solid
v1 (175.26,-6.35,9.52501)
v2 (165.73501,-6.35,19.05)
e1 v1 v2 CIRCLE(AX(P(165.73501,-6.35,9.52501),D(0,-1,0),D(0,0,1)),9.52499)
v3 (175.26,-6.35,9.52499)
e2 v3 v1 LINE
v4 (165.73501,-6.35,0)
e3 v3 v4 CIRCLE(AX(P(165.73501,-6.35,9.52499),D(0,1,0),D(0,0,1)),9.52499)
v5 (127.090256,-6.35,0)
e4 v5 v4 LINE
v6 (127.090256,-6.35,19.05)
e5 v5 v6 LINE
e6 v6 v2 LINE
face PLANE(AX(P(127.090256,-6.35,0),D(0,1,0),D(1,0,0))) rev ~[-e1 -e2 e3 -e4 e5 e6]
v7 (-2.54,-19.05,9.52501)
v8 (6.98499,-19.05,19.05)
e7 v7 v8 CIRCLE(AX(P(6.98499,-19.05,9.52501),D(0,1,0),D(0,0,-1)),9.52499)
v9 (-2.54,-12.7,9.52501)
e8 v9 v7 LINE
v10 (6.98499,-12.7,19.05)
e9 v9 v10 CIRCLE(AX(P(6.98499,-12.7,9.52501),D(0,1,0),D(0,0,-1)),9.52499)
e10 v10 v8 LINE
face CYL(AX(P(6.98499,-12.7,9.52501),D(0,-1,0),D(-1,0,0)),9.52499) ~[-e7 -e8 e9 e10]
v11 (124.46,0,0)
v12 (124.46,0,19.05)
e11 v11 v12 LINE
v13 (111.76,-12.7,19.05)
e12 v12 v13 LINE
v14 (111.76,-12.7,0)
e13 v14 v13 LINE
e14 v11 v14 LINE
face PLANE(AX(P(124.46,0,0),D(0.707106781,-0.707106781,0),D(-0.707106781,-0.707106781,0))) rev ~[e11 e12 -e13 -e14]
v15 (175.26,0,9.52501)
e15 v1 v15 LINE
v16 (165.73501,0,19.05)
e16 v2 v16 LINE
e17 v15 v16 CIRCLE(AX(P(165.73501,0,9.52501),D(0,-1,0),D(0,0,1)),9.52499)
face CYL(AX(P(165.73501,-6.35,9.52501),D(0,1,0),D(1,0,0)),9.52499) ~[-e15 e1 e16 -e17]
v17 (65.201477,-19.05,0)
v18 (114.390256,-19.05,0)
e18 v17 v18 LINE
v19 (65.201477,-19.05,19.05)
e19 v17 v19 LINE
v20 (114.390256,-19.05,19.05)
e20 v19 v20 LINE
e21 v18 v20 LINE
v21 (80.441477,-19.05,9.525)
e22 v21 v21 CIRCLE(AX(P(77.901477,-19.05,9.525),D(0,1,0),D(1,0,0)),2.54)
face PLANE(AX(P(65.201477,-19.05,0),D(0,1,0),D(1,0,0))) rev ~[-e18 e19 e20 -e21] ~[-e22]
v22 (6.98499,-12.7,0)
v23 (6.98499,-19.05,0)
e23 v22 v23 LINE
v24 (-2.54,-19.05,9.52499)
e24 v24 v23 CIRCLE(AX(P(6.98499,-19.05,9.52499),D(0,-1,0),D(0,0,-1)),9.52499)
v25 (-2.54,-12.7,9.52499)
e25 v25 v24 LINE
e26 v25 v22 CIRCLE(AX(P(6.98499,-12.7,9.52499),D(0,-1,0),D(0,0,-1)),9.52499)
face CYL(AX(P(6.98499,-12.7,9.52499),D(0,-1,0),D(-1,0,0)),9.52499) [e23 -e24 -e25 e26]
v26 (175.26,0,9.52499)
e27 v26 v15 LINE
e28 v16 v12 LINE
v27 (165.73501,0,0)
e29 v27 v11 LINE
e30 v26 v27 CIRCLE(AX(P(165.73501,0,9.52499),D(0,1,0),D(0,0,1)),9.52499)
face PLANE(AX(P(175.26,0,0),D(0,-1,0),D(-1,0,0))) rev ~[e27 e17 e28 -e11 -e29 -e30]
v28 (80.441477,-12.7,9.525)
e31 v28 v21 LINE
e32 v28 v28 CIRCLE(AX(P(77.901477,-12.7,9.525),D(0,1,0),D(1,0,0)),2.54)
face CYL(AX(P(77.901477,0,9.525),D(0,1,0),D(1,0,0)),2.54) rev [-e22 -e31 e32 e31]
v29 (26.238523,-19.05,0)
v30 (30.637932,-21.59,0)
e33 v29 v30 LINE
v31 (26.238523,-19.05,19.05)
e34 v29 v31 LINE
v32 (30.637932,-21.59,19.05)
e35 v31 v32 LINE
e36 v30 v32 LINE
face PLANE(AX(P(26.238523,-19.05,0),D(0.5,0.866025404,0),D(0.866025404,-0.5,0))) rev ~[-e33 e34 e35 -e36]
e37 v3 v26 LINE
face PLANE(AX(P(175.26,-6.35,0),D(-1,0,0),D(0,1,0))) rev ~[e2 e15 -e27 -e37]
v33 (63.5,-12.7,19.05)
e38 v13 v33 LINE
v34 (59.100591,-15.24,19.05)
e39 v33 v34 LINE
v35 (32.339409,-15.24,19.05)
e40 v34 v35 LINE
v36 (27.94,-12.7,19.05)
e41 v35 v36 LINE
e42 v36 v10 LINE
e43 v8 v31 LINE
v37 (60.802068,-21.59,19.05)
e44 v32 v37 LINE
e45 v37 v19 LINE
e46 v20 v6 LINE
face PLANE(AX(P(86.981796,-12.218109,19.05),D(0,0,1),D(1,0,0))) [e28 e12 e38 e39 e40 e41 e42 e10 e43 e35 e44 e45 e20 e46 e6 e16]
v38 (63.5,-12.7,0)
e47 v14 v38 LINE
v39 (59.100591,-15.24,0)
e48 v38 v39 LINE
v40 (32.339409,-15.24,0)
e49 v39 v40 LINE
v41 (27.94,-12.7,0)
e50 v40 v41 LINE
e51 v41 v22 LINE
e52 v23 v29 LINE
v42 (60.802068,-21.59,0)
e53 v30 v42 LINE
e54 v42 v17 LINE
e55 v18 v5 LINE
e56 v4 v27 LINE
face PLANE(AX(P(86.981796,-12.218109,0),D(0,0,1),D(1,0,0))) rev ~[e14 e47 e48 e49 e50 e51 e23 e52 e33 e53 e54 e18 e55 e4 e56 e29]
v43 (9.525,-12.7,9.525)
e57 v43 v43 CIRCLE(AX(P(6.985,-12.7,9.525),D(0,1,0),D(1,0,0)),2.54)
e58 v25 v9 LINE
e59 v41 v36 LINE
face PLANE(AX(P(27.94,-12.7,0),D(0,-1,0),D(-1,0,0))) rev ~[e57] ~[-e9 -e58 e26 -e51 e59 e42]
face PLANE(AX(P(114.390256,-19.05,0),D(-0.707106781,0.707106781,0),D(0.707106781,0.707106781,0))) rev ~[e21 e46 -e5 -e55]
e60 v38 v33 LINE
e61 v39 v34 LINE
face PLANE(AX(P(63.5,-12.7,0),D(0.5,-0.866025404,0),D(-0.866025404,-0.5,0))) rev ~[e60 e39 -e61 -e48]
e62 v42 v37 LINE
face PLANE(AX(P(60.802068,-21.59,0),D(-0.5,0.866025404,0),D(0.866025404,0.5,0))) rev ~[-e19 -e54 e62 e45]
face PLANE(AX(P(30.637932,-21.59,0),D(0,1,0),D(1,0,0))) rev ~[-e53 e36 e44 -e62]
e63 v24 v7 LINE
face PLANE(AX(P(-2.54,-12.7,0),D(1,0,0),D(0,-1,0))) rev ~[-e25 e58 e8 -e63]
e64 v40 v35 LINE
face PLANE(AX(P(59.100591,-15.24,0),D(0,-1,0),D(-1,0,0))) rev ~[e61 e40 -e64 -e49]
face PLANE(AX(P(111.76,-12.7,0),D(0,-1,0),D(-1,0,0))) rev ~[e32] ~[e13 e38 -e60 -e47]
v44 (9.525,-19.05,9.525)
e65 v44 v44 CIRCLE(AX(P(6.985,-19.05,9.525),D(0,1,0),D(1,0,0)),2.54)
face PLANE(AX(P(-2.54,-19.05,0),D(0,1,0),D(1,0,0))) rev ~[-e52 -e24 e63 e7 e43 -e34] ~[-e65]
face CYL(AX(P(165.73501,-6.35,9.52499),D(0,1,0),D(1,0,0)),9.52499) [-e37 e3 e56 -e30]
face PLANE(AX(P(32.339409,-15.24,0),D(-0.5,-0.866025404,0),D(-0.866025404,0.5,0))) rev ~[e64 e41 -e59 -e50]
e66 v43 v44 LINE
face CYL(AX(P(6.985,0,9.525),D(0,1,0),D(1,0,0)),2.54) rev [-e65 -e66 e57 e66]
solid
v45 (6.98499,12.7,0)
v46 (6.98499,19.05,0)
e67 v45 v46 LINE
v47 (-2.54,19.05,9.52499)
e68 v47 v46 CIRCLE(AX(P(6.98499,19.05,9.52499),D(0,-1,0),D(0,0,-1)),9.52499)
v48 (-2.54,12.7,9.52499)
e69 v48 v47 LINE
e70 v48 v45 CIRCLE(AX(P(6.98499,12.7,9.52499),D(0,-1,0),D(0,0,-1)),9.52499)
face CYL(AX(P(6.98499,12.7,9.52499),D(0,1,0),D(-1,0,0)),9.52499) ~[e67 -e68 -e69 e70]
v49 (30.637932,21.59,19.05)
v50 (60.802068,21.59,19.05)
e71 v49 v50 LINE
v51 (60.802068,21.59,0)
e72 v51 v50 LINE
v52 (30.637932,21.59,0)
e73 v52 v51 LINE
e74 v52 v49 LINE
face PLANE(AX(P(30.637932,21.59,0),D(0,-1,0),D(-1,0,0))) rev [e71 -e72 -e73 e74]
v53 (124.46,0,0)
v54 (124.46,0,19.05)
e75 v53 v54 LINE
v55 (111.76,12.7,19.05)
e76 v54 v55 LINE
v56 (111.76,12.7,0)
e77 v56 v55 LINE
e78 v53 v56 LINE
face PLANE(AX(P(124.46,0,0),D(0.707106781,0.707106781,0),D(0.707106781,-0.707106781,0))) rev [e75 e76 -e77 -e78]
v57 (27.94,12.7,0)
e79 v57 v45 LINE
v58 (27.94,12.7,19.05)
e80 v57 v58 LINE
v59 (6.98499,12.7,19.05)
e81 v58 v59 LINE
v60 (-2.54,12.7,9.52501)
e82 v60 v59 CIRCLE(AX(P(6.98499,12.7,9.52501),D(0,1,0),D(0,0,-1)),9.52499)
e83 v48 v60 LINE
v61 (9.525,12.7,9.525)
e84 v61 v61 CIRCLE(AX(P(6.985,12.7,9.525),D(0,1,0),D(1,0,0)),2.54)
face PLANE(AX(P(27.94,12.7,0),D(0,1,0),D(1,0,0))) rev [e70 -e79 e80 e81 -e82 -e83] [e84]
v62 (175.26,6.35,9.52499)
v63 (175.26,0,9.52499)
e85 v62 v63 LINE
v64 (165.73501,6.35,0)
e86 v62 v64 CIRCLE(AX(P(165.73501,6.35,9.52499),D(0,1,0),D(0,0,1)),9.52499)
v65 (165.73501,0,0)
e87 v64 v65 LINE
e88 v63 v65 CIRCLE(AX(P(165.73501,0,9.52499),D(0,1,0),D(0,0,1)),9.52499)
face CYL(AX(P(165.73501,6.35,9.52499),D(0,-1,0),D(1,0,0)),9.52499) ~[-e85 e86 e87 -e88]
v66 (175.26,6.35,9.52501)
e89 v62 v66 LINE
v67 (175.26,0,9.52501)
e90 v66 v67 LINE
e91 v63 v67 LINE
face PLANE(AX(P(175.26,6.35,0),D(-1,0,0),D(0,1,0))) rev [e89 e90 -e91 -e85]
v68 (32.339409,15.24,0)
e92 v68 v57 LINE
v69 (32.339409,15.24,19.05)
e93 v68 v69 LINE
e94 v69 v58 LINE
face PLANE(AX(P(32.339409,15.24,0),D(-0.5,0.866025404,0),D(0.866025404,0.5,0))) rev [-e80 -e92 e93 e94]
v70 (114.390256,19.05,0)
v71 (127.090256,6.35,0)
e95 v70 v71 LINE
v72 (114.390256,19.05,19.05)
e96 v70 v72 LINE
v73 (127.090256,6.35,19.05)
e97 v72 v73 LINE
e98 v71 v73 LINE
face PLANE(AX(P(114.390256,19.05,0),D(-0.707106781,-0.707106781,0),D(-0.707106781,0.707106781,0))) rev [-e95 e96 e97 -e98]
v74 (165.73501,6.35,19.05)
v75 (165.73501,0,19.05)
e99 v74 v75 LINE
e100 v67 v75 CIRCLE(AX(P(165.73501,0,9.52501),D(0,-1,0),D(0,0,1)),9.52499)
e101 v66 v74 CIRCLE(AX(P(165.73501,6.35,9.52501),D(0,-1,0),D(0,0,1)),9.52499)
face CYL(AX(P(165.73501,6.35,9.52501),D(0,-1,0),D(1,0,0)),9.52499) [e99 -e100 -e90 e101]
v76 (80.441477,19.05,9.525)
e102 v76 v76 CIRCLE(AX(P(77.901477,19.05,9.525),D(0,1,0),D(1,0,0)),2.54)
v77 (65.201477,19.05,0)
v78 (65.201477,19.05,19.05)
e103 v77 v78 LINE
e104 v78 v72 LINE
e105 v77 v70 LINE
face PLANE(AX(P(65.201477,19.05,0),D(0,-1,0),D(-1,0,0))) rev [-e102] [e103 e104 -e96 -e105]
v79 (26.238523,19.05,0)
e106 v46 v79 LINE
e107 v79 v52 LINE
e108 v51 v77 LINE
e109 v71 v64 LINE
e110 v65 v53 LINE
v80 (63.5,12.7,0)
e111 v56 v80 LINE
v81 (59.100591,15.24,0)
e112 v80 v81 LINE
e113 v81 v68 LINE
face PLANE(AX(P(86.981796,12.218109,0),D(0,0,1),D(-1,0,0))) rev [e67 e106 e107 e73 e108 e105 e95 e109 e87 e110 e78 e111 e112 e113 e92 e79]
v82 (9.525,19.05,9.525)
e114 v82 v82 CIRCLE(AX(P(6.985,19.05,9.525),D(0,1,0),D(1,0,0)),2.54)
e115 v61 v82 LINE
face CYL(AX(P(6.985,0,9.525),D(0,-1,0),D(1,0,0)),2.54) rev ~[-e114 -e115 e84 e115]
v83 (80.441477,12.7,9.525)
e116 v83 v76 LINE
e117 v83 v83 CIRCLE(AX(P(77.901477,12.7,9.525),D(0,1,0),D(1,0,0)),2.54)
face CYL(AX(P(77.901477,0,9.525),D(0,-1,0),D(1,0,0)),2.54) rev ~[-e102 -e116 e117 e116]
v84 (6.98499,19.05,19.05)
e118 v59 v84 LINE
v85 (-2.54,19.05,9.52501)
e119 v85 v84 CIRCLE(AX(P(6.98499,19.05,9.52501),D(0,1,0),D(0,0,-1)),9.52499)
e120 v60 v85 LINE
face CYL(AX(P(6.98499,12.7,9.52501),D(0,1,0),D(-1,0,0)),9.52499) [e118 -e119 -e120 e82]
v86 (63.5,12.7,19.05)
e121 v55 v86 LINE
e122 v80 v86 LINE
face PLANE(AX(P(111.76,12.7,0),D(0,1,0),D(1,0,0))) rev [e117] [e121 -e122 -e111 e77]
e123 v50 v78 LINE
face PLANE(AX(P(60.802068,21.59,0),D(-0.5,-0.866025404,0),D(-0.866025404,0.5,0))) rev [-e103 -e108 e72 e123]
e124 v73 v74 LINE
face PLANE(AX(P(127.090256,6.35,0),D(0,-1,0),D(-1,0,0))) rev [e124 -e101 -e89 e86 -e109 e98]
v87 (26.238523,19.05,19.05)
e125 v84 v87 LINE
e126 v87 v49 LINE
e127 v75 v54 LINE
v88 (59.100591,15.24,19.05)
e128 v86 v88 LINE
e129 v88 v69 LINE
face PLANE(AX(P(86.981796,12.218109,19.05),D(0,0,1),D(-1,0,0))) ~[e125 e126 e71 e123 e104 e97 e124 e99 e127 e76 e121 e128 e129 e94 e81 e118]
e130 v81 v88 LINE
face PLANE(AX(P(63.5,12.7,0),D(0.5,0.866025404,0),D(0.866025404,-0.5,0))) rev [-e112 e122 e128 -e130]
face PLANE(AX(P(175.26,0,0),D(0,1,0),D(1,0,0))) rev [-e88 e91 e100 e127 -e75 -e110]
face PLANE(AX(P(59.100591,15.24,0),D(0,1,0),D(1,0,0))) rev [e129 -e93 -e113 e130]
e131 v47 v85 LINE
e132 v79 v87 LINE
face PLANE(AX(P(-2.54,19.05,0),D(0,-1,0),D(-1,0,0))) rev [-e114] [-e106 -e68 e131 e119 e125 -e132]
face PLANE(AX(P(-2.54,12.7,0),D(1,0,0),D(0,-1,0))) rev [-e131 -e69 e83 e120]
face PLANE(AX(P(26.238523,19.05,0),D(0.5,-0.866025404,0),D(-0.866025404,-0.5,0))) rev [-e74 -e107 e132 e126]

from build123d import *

# Parameters (mm, degrees)
F1_DEPTH = 19.05
F2_R     = 9.52499
F3_R     = 2.54
F4_DEPTH = 25.4


# Not quite as in the source:
# - a fillet or chamfer is up to 0.001 mm smaller than in the source, because OpenCascade refuses the exact size


with BuildPart() as f1:
    # F0 (on Top) → F1 (new body)
    with BuildSketch(Plane.XY):
        Polygon((27.94, -12.7), (-2.54, -12.7), (-2.54, -19.05), (26.2385226281, -19.05), (30.6379316793, -21.59), (60.8020683207, -21.59), (65.2014773719, -19.05), (114.3902561211, -19.05), (127.0902561211, -6.35), (175.26, -6.35), (175.26, 0), (124.46, 0), (111.76, -12.7), (63.5, -12.7), (59.1005909488, -15.24), (32.3394090512, -15.24), align=None)
    extrude(amount=F1_DEPTH)

    # F2 (radius 9.525 in the source; OpenCascade refuses exactly that, so slightly less here)
    f2_edges = [f1.edges().sort_by_distance(p)[0] for p in [
        (-2.54, -15.875, 19.05),
        (-2.54, -15.875, 0),
        (175.26, -3.175, 19.05),
        (175.26, -3.175, 0),
    ]]
    fillet(f2_edges, radius=F2_R)

    # F3 (on Front) → F4 (cut)
    with BuildSketch(Plane.XZ):
        with Locations((6.985, 9.525)):
            Circle(F3_R)
        with Locations((77.9014773719, 9.525)):
            Circle(F3_R)
    extrude(amount=F4_DEPTH, mode=Mode.SUBTRACT)


with BuildPart() as f5_1:
    # F5: instance of F1
    add(f1.part.mirror(Plane.XZ))


solid = Compound([f1.part, f5_1.part])
